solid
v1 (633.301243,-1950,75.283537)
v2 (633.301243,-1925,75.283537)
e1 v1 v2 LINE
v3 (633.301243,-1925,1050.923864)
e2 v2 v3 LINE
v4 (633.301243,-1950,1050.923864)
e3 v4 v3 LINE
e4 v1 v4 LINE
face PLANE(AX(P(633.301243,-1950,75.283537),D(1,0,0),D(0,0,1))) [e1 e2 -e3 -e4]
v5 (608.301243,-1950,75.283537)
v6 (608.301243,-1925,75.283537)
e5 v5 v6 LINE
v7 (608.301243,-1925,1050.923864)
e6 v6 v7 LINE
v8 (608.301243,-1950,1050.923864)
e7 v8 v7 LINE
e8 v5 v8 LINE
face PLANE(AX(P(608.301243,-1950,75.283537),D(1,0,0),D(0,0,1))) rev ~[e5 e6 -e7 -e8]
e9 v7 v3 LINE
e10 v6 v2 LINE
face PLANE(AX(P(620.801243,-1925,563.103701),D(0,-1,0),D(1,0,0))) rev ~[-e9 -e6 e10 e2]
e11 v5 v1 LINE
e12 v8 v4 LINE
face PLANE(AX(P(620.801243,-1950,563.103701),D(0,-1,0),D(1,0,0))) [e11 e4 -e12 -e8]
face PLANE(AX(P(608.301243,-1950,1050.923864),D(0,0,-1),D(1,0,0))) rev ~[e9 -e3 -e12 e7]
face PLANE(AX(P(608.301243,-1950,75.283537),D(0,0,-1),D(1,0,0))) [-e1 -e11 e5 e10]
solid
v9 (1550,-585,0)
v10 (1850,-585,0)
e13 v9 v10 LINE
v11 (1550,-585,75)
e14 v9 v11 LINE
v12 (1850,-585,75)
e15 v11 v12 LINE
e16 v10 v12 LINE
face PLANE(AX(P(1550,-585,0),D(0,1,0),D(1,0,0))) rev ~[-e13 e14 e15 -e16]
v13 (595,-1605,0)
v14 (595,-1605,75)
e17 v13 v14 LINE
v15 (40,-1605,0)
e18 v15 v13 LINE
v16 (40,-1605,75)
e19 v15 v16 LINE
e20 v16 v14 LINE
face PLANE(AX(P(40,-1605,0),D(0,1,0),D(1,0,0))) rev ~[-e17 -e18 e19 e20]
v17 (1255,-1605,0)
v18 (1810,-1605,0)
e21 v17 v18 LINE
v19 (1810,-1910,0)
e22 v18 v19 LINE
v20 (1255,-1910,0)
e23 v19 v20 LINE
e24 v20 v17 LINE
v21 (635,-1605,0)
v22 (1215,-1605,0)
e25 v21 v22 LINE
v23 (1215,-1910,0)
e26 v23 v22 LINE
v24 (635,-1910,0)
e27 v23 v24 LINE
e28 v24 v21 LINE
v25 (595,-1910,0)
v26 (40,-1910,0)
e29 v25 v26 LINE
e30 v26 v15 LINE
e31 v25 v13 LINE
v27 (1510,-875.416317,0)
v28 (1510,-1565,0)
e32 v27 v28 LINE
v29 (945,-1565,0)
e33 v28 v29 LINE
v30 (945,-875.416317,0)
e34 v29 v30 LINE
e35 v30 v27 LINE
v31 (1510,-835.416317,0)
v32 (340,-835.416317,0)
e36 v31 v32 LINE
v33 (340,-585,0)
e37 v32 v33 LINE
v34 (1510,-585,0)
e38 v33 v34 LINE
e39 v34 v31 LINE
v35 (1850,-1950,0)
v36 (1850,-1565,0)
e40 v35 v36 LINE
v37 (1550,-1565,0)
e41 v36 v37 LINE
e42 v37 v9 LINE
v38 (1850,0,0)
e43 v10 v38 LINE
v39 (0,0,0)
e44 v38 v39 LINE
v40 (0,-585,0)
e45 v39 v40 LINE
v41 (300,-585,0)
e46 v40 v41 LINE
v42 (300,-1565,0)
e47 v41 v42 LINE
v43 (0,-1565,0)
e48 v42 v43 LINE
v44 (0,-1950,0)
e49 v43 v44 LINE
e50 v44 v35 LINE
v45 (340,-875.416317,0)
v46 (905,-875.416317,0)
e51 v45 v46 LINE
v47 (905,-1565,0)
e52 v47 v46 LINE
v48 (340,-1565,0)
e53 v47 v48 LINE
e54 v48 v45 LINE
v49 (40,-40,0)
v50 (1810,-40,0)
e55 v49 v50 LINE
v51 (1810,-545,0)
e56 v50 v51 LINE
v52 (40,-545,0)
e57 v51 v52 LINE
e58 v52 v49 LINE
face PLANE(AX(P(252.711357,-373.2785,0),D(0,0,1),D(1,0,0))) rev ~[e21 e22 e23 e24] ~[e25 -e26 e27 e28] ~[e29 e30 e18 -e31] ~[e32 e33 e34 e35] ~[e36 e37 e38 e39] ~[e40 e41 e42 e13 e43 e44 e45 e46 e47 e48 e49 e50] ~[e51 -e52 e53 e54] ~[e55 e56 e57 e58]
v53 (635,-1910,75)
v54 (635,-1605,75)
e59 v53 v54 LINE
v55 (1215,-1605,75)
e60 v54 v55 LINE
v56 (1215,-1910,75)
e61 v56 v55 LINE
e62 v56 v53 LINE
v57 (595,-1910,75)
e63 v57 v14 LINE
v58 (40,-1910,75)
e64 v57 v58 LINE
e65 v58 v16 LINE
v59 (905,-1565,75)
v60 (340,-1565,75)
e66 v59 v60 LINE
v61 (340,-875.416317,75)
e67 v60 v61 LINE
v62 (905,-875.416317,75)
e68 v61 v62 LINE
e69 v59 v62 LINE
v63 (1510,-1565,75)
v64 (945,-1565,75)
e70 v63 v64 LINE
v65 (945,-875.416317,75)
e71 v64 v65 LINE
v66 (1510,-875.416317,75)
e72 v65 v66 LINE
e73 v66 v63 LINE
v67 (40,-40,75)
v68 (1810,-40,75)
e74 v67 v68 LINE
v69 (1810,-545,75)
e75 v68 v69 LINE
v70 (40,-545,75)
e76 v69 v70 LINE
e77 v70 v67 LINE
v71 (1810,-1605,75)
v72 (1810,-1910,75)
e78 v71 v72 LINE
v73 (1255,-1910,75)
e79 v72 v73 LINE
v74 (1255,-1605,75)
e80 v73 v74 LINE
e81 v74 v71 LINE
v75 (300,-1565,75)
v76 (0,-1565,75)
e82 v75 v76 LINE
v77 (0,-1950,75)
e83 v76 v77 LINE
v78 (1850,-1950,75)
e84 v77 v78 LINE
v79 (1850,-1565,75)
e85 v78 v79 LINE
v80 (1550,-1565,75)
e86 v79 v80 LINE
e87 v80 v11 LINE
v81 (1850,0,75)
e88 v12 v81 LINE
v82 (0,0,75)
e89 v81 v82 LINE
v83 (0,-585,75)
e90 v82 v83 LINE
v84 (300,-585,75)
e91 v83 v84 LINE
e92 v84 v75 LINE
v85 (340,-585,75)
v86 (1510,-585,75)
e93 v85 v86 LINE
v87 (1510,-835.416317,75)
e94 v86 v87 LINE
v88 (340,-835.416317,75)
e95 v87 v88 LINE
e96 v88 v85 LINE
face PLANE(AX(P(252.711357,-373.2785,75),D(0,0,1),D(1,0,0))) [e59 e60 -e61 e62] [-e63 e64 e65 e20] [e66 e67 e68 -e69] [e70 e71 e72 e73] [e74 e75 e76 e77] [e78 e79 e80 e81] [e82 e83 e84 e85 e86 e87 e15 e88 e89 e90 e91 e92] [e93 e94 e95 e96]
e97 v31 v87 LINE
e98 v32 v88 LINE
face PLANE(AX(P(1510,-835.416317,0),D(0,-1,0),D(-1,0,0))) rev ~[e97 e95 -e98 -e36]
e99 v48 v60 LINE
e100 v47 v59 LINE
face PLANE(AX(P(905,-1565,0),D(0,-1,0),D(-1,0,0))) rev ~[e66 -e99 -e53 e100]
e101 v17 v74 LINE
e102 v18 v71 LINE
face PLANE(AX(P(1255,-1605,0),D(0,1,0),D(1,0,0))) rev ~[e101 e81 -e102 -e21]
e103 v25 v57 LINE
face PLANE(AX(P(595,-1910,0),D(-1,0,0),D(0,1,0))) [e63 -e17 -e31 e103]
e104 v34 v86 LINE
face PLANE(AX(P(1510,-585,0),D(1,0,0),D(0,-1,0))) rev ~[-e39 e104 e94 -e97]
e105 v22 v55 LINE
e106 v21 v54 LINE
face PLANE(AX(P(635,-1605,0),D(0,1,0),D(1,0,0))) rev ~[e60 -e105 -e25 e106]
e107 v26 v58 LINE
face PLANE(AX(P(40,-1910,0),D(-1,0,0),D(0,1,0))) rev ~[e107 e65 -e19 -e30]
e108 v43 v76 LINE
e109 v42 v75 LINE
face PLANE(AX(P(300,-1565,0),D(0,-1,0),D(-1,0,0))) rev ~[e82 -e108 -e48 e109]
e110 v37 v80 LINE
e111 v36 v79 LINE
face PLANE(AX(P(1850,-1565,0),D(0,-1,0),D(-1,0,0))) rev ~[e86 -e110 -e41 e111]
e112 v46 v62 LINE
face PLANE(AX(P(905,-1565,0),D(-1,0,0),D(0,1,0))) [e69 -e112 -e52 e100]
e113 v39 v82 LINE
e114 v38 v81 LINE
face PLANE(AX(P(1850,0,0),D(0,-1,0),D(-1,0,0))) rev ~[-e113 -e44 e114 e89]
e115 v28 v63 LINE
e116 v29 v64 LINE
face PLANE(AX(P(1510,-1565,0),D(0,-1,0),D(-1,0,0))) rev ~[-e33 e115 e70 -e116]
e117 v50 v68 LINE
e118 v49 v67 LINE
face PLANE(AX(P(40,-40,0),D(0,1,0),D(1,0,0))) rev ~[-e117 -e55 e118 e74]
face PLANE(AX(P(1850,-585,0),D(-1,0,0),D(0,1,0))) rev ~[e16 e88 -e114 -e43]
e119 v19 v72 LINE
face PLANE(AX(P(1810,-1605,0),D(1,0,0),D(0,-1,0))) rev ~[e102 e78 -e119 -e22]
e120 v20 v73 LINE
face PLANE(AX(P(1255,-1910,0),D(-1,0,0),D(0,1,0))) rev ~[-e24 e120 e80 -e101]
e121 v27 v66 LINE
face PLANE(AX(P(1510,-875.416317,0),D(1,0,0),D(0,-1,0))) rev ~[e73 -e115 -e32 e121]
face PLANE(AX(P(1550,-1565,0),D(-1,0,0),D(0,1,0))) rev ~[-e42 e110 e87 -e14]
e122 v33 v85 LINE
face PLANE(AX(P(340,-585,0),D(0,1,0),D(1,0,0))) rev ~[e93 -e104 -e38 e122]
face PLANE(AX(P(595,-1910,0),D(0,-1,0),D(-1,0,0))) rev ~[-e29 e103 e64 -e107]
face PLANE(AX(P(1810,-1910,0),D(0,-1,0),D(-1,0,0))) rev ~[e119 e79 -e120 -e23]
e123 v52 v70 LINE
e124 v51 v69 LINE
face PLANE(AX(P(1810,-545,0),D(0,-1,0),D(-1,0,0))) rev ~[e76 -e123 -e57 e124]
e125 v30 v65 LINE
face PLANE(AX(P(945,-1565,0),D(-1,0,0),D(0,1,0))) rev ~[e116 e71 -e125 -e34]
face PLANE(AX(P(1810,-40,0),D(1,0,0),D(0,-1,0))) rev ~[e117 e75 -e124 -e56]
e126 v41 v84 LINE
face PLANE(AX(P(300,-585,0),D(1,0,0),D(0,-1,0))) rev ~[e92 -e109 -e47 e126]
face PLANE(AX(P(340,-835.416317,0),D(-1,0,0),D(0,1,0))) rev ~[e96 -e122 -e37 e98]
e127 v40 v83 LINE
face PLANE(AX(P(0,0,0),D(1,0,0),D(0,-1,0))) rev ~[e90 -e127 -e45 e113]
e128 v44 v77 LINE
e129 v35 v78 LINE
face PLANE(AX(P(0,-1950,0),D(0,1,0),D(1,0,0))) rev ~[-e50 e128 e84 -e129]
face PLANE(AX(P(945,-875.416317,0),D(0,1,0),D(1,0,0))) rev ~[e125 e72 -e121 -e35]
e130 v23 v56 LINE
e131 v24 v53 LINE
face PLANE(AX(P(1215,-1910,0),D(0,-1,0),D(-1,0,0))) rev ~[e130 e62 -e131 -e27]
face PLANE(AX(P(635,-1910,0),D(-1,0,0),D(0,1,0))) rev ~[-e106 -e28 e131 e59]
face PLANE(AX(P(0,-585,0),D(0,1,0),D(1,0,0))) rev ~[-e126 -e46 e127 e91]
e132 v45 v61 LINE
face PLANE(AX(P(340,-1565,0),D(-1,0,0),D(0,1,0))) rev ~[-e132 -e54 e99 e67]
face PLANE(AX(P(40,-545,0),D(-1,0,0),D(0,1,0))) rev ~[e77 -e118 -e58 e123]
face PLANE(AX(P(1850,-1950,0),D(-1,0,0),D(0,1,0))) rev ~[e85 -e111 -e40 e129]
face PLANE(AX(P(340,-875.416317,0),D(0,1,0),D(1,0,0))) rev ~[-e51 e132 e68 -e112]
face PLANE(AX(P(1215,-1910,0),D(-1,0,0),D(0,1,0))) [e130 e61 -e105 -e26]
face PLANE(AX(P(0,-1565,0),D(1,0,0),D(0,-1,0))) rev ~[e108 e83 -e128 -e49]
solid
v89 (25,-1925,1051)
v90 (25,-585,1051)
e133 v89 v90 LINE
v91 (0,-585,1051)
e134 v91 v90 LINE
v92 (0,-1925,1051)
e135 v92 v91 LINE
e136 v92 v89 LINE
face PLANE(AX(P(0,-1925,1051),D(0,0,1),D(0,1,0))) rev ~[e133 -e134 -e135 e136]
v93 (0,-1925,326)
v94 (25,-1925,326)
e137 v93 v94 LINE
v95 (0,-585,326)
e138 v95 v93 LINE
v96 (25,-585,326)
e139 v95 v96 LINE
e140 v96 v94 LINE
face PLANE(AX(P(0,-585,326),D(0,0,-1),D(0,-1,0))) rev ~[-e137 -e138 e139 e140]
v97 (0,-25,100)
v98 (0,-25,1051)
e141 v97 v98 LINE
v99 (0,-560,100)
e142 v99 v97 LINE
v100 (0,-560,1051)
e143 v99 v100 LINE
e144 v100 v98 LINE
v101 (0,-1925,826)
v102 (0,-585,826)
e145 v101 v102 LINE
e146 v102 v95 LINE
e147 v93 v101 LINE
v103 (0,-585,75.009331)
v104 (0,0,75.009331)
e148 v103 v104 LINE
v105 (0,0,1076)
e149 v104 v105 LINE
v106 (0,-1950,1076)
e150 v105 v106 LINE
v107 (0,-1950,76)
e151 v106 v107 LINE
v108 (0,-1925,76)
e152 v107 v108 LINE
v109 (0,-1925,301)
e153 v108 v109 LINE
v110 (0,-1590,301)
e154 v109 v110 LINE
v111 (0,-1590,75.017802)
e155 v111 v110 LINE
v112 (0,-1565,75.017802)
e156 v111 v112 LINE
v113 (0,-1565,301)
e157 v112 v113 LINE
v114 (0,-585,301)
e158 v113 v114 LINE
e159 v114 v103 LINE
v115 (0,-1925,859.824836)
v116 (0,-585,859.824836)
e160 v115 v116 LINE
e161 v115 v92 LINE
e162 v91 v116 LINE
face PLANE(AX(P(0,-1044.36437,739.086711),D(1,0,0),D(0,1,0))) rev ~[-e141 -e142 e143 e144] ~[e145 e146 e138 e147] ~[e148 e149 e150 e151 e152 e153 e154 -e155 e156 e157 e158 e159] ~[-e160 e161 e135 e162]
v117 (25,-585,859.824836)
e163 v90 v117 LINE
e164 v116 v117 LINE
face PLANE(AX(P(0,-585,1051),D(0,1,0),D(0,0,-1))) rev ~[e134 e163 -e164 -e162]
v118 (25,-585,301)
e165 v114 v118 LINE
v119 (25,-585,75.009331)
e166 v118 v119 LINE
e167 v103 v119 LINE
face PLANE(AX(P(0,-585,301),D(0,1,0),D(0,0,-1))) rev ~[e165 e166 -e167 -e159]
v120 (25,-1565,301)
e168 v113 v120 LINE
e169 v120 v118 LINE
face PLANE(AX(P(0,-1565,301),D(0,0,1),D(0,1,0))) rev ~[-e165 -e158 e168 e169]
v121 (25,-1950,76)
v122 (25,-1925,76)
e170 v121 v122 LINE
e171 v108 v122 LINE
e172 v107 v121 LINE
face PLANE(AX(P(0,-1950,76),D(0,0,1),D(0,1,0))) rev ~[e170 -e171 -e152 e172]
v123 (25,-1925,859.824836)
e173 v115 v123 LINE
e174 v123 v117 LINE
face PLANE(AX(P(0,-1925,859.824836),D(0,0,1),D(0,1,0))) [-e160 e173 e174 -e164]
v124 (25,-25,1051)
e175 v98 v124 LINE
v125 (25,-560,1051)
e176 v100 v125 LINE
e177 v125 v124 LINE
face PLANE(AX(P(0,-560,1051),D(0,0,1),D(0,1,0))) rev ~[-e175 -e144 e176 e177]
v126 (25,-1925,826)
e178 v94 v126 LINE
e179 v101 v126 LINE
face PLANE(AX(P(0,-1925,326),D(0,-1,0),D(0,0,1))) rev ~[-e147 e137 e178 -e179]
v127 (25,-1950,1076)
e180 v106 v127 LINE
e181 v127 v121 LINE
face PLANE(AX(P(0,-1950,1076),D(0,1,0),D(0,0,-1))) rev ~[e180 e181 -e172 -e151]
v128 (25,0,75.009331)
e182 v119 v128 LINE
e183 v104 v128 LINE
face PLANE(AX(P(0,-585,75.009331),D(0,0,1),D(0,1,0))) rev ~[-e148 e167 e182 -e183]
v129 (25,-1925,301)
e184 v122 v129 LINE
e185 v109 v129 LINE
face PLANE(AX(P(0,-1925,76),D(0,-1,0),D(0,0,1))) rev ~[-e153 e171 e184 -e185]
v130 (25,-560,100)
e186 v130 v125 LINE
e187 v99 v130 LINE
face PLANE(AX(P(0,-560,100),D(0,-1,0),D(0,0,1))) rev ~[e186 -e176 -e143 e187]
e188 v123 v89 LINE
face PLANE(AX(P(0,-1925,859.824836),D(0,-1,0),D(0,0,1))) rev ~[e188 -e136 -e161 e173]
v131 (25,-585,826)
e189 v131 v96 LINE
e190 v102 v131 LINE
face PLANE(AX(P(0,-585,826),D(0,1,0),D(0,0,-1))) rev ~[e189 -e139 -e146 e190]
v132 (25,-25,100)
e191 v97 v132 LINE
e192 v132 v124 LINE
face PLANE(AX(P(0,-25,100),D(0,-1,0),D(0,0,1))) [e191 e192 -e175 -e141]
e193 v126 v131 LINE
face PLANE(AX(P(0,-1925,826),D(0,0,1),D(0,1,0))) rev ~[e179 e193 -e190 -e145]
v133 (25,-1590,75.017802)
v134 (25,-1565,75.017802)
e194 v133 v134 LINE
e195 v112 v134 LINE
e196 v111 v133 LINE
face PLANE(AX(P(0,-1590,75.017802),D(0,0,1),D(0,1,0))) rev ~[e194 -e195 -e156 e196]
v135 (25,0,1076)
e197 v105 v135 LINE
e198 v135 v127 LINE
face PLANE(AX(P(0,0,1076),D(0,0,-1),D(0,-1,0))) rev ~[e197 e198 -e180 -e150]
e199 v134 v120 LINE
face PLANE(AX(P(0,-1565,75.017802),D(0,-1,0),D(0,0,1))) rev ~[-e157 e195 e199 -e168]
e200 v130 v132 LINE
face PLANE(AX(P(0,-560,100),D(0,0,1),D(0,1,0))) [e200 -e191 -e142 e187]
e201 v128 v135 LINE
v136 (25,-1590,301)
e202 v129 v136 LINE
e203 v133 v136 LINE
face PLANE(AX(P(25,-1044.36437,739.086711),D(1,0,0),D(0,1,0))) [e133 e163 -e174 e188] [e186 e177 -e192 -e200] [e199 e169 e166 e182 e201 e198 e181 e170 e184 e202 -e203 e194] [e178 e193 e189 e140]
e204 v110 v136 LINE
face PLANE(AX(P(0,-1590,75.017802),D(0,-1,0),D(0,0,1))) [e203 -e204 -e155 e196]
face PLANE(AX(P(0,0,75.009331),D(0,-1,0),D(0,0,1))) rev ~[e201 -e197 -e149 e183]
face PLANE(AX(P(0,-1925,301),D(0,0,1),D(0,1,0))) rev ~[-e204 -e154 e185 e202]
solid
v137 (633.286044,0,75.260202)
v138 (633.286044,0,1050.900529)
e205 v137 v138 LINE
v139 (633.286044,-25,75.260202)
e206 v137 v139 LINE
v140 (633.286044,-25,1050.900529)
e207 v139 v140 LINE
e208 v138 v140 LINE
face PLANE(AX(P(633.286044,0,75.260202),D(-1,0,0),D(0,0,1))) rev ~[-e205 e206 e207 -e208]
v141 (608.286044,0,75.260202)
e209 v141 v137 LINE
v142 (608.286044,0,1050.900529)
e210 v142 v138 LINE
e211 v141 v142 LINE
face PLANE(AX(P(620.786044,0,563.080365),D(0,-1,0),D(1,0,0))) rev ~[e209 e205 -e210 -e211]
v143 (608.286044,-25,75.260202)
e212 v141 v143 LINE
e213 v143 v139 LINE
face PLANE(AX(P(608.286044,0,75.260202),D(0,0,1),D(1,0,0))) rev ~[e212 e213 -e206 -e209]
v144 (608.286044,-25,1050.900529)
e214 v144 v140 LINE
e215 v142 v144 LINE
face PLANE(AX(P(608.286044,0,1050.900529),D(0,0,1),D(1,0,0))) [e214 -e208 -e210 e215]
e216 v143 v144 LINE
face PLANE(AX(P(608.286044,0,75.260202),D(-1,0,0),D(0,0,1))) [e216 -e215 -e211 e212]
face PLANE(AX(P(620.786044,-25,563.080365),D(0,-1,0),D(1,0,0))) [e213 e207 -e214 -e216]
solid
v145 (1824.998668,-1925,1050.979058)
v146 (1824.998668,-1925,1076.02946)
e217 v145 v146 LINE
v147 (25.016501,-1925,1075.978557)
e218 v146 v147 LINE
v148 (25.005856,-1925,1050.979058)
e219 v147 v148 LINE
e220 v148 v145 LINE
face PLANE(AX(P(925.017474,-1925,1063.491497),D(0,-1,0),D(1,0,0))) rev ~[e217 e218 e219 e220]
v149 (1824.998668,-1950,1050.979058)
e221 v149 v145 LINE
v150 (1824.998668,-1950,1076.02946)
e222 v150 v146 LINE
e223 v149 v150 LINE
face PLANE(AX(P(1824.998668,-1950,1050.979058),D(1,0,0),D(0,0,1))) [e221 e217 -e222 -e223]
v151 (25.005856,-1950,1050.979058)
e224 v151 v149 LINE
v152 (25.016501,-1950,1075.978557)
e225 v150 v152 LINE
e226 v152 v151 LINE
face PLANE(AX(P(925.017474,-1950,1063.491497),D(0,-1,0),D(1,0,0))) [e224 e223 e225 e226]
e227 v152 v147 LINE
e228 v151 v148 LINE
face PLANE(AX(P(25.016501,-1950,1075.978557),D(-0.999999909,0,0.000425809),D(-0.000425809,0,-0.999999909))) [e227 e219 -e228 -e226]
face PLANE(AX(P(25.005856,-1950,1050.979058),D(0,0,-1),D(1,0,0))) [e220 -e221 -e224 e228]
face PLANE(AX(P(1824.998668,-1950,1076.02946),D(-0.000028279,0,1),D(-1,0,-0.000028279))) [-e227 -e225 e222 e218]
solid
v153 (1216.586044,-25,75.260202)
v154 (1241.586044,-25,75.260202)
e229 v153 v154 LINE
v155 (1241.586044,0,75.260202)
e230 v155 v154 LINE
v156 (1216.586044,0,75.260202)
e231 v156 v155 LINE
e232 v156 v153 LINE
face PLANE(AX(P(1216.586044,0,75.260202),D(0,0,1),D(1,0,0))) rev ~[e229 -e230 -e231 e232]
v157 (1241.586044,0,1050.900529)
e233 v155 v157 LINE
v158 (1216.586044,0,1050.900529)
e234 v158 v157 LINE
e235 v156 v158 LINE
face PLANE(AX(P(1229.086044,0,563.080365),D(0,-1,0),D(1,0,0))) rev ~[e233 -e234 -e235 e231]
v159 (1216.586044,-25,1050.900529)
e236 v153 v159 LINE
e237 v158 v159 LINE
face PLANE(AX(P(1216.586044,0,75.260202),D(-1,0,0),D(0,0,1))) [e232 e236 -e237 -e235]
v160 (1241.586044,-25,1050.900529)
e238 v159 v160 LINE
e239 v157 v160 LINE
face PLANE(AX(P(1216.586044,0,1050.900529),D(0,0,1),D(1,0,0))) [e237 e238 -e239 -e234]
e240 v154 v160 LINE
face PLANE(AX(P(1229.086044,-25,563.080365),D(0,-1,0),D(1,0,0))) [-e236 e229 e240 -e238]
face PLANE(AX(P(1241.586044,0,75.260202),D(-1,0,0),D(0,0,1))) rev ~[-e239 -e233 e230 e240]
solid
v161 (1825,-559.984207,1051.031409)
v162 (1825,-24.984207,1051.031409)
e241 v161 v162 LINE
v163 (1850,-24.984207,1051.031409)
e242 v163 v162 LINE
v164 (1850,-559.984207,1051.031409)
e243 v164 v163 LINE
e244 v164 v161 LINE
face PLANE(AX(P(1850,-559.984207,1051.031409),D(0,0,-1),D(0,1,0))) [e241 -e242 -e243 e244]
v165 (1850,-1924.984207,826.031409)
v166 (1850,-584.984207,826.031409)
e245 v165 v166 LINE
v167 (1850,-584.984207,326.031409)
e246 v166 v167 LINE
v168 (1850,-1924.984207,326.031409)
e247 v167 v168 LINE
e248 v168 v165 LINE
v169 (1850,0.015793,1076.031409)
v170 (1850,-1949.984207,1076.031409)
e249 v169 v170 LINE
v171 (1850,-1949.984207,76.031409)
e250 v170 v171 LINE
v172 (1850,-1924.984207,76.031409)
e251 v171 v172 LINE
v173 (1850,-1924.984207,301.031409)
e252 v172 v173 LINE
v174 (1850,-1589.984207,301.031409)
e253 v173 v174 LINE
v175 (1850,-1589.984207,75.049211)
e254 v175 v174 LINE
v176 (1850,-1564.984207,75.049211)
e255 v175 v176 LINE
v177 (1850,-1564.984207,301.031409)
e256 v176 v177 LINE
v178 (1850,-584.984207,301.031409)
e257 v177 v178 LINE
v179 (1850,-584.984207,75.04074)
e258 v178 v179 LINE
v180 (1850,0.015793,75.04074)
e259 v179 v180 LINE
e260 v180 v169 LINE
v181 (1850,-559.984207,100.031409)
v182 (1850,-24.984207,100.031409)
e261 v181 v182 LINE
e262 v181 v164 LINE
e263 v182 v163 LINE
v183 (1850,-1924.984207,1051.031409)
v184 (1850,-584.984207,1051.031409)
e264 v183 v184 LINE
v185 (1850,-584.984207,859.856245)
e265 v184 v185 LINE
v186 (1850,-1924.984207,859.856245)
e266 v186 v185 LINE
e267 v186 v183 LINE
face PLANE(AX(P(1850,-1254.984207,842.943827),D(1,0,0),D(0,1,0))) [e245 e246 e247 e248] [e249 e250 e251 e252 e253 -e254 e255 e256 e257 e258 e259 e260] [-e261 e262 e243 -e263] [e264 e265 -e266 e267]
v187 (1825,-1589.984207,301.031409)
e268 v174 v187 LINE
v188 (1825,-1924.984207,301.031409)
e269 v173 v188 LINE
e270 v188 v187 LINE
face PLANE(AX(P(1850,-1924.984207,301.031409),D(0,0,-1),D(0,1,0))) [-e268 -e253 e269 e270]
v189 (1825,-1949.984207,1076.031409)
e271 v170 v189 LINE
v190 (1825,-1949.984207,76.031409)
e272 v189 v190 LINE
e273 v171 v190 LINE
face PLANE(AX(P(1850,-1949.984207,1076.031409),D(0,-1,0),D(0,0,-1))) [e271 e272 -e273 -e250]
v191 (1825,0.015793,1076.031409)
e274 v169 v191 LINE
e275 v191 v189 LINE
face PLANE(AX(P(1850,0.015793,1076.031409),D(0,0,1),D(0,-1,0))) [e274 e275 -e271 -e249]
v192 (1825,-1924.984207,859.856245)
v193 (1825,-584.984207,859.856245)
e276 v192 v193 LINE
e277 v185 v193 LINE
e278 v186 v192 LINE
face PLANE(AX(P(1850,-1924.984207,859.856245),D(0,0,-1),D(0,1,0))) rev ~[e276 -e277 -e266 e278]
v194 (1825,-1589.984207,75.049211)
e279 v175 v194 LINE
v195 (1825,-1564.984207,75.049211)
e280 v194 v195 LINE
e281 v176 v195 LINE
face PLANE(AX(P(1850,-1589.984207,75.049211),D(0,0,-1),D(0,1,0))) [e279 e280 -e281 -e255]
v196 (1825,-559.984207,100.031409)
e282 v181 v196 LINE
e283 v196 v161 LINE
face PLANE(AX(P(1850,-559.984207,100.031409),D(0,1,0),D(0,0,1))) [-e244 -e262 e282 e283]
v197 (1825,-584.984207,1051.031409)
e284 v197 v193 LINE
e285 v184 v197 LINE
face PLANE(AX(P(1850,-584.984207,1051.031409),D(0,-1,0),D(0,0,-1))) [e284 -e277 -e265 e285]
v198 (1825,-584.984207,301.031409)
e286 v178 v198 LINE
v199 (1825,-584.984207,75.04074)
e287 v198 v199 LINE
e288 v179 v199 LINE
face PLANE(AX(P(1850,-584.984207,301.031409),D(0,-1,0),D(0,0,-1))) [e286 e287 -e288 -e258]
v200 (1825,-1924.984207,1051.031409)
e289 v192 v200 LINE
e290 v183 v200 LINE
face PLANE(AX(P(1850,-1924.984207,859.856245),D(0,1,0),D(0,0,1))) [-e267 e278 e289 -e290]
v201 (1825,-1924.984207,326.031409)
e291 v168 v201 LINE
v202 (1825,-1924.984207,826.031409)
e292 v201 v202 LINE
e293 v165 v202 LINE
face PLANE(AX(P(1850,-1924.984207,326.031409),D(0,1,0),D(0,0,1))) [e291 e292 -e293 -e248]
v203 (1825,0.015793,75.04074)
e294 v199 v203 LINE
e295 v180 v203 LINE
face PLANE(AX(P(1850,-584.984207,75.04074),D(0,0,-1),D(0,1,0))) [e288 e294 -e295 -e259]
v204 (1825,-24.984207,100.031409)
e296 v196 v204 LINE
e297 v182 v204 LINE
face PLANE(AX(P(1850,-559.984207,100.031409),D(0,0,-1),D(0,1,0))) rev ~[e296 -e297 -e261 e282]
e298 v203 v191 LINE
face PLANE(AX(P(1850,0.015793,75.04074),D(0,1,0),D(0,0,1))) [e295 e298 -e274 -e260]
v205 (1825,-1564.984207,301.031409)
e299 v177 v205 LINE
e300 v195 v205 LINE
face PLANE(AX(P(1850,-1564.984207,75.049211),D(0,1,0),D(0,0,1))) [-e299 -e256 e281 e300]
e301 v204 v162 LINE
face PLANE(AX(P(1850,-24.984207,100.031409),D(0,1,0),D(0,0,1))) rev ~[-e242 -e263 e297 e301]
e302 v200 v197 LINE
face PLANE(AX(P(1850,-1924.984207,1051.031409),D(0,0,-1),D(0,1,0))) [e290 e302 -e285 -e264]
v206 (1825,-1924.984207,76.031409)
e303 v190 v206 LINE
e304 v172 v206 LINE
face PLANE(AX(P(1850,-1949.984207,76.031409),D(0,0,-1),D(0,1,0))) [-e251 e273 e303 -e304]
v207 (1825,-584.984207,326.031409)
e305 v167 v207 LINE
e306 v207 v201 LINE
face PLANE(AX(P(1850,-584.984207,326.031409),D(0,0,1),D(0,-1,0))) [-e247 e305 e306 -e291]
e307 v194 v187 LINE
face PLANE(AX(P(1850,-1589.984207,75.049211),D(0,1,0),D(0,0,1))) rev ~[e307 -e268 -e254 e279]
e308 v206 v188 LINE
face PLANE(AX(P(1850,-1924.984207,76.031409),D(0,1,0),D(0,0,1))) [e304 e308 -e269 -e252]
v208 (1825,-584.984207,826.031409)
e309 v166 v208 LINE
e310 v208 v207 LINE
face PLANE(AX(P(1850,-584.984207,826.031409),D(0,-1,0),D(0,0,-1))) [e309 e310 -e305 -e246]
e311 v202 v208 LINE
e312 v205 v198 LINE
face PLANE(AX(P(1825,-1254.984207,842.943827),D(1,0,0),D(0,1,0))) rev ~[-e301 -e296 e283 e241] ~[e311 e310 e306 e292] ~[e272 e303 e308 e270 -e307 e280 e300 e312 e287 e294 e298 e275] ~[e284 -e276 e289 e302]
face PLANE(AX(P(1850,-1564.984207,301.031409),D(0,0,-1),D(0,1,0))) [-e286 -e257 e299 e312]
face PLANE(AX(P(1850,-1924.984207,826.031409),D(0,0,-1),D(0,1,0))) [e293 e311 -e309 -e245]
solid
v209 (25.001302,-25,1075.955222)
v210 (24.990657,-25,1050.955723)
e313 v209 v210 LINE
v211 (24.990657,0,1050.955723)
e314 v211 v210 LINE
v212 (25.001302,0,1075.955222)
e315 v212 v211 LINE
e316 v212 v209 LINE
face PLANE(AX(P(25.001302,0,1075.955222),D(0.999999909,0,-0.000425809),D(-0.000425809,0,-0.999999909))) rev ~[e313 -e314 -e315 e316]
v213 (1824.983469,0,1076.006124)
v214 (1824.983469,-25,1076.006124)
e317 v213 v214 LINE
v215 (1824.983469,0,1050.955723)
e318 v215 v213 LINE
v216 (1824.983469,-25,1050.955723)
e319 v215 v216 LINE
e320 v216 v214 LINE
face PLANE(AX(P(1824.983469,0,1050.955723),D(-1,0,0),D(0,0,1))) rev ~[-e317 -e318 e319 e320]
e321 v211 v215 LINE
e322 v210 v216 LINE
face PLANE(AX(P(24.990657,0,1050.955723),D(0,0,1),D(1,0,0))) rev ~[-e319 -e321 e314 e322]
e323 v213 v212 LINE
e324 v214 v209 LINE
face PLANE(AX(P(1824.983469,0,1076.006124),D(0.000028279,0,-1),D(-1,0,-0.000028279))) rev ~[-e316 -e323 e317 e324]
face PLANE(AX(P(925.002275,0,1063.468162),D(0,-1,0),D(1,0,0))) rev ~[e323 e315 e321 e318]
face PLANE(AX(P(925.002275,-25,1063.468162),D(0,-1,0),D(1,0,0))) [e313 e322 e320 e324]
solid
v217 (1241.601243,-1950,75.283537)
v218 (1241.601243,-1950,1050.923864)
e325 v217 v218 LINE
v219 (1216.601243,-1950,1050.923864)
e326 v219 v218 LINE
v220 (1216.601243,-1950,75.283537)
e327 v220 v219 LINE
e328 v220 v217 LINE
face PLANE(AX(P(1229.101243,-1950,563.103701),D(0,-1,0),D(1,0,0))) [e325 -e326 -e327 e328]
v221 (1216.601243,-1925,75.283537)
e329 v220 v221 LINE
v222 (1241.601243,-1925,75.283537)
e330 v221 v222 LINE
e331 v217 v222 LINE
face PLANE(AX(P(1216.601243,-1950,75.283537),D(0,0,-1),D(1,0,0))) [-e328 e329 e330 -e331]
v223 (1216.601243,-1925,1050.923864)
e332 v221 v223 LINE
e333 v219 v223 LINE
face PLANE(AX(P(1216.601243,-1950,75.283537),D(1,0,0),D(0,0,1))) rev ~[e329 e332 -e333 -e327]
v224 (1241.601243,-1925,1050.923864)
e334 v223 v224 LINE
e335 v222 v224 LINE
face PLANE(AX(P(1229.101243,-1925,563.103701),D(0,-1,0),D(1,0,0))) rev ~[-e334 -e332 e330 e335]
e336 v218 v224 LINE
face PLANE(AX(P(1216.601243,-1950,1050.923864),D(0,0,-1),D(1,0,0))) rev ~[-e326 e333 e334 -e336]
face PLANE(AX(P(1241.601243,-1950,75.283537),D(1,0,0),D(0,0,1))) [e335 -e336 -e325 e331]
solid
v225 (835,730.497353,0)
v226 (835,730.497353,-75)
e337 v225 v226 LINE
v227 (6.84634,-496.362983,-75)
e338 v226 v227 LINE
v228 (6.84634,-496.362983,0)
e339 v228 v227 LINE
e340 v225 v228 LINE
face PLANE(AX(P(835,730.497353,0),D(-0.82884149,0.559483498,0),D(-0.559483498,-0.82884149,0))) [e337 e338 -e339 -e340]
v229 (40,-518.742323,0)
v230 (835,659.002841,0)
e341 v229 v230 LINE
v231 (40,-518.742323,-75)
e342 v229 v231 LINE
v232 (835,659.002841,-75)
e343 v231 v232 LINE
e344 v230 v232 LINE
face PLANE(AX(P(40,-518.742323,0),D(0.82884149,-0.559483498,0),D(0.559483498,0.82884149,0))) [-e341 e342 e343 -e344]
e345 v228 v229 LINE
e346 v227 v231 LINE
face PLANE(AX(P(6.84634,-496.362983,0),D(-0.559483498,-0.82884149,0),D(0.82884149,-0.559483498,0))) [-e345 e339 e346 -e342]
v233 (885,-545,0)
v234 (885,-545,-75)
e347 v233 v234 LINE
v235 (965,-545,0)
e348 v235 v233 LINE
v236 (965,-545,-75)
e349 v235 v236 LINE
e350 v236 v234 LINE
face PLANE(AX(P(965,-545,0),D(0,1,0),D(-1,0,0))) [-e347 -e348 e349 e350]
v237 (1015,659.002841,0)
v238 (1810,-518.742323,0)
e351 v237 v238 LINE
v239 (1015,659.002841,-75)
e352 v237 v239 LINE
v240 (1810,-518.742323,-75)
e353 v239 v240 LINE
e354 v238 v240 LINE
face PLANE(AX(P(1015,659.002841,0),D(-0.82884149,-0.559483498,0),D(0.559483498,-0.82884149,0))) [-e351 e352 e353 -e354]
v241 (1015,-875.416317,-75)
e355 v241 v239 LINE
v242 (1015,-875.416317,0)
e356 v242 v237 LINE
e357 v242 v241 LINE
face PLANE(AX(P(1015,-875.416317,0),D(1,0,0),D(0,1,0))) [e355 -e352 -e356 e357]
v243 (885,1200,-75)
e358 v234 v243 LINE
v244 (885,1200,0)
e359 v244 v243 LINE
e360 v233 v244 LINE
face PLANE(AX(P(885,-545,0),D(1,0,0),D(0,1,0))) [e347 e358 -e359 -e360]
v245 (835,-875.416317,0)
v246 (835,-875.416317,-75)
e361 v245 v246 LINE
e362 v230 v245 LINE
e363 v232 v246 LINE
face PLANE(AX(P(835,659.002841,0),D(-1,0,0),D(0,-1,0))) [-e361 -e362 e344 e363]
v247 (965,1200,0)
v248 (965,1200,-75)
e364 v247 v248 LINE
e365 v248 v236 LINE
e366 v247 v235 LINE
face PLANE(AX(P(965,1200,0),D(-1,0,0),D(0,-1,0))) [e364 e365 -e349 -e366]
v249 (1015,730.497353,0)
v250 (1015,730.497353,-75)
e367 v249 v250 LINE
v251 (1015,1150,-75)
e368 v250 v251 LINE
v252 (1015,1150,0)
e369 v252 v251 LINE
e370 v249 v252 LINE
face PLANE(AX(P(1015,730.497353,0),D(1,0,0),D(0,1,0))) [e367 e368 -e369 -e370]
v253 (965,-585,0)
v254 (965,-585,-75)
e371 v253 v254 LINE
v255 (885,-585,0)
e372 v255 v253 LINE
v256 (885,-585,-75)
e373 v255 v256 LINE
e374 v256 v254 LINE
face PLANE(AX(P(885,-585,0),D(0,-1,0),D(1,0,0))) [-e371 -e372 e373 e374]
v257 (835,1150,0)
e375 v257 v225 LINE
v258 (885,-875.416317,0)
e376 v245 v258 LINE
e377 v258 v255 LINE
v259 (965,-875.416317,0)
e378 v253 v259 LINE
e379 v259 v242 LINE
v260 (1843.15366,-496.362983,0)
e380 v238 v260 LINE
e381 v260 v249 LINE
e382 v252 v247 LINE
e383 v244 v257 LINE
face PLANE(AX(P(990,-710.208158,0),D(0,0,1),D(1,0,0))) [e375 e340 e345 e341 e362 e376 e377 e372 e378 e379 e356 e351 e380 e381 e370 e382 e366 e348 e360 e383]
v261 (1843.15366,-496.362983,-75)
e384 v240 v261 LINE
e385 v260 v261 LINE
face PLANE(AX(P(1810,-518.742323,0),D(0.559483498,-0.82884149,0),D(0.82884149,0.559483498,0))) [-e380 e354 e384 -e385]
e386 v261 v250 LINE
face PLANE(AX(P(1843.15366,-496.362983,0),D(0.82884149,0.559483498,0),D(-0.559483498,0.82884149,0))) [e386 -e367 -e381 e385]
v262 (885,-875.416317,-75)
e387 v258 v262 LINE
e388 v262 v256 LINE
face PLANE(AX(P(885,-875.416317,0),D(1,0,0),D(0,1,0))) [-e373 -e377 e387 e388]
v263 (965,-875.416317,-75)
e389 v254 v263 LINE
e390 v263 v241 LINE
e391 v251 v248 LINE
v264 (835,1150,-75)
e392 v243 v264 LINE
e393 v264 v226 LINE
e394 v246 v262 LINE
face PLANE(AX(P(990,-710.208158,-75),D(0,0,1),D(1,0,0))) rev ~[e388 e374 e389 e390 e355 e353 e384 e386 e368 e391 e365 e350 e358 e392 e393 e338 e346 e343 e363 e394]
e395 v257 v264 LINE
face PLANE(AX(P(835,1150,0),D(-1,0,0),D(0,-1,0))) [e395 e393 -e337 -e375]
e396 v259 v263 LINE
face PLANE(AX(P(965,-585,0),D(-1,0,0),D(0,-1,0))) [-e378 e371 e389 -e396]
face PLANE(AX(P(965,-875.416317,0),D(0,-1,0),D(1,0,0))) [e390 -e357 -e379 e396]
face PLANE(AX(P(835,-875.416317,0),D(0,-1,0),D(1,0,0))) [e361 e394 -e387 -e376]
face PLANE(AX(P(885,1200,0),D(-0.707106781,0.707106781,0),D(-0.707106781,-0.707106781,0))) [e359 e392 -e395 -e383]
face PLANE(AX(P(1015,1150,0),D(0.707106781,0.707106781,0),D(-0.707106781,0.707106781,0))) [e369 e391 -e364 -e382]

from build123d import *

# Parameters (mm, degrees)
F0_W      = 50
F0_H      = 40
F0_W_2    = 80
F0_W_3    = 495
F0_W_4    = 40
F0_H_2    = 689.5836830139
F0_H_3    = 305
F1_DEPTH  = 75
F0_H_4    = 250.4163169861
F0_H_5    = 505
F2_DEPTH  = 75
F3_W      = 535
F3_H      = 951
F3_W_2    = 25
F3_H_2    = 225.9821975827
F3_W_3    = 1340
F3_H_3    = 33.8248362541
F4_DEPTH  = 25
F7_W      = 1340
F7_H      = 33.8248362541
F7_W_2    = 535
F7_H_2    = 951
F7_W_3    = 25
F7_H_3    = 225.9821975827
F8_DEPTH  = 25
F9_W      = 25
F9_H      = 975.6403267384
F10_DEPTH = 25
F12_DEPTH = 25
F11_W     = 25
F11_H     = 975.6403267384


# Not quite as in the source:
# - a feature names something its author has since deleted; it is built from what else it names


with BuildPart() as f1:
    # F0 (on Top) → F1 (new body)
    with BuildSketch(Plane.XY):
        Polygon((341.9006320566, 0), (0, 0), (0, -585), (300, -585), (340, -585), (835, -585), (835, -545), (40, -545), (40, -518.7423229218), (6.8463404132, -496.362982985), (40, -447.2478103703), (40, -40), (314.8998843676, -40), align=None)
        Polygon((390.1607644204, 0), (341.9006320566, 0), (314.8998843676, -40), (363.1600167314, -40), align=None)
        Polygon((835, 0), (390.1607644204, 0), (363.1600167314, -40), (835, -40), align=None)
        Polygon((340, -585), (300, -585), (300, -1565), (340, -1565), (340, -875.4163169861), (340, -835.4163169861), align=None)
        with Locations((860, -20)):
            Rectangle(F0_W, F0_H)
        Polygon((40, -518.7423229218), (40, -447.2478103703), (6.8463404132, -496.362982985), align=None)
        Polygon((340, -1565), (300, -1565), (0, -1565), (0, -1950), (1850, -1950), (1850, -1565), (1550, -1565), (1510, -1565), (945, -1565), (905, -1565), align=None)
        Polygon((1255, -1605), (1810, -1605), (1810, -1910), (1255, -1910), (1215, -1910), (635, -1910), (595, -1910), (40, -1910), (40, -1605), (595, -1605), (635, -1605), (1215, -1605), align=None, mode=Mode.SUBTRACT)
        with Locations((925, -20)):
            Rectangle(F0_W_2, F0_H)
        with Locations((860, -565)):
            Rectangle(F0_W, F0_H)
        with Locations((587.5, -855.4163169861)):
            Rectangle(F0_W_3, F0_H)
        with Locations((990, -20)):
            Rectangle(F0_W, F0_H)
        with Locations((925, -565)):
            Rectangle(F0_W_2, F0_H)
        with Locations((860, -855.4163169861)):
            Rectangle(F0_W, F0_H)
        with Locations((925, -1220.208158493)):
            Rectangle(F0_W_4, F0_H_2)
        Polygon((1459.8392355796, 0), (1015, 0), (1015, -40), (1486.8399832686, -40), align=None)
        with Locations((990, -565)):
            Rectangle(F0_W, F0_H)
        Polygon((965, -835.4163169861), (885, -835.4163169861), (885, -875.4163169861), (905, -875.4163169861), (945, -875.4163169861), (965, -875.4163169861), align=None)
        Polygon((1508.0993679434, 0), (1459.8392355796, 0), (1486.8399832686, -40), (1535.1001156324, -40), align=None)
        Polygon((1015, -545), (1015, -585), (1510, -585), (1550, -585), (1850, -585), (1850, 0), (1508.0993679434, 0), (1535.1001156324, -40), (1810, -40), (1810, -447.2478103703), (1843.1536595868, -496.362982985), (1810, -518.7423229218), (1810, -545), align=None)
        with Locations((990, -855.4163169861)):
            Rectangle(F0_W, F0_H)
        Polygon((1510, -875.4163169861), (1510, -1565), (1550, -1565), (1550, -585), (1510, -585), (1510, -835.4163169861), align=None)
        with Locations((1262.5, -855.4163169861)):
            Rectangle(F0_W_3, F0_H)
        Polygon((1810, -447.2478103703), (1810, -518.7423229218), (1843.1536595868, -496.362982985), align=None)
        with Locations((1235, -1757.5)):
            Rectangle(F0_W_4, F0_H_3)
        with Locations((615, -1757.5)):
            Rectangle(F0_W_4, F0_H_3)
    extrude(amount=F1_DEPTH)


with BuildPart() as f2:
    # F0 (on Top) → F2 (new body)
    with BuildSketch(Plane.XY):
        with Locations((990, -710.208158493)):
            Rectangle(F0_W, F0_H_4)
        Polygon((835, 730.4973530704), (341.9006320566, 0), (390.1607644204, 0), (835, 659.0028405189), align=None)
        Polygon((363.1600167314, -40), (314.8998843676, -40), (40, -447.2478103703), (40, -518.7423229218), align=None)
        Polygon((390.1607644204, 0), (341.9006320566, 0), (314.8998843676, -40), (363.1600167314, -40), align=None)
        with Locations((990, -292.5)):
            Rectangle(F0_W, F0_H_5)
        Polygon((1535.1001156324, -40), (1486.8399832686, -40), (1810, -518.7423229218), (1810, -447.2478103703), align=None)
        Polygon((1015, 659.0028405189), (1459.8392355796, 0), (1508.0993679434, 0), (1015, 730.4973530704), align=None)
        Polygon((1508.0993679434, 0), (1459.8392355796, 0), (1486.8399832686, -40), (1535.1001156324, -40), align=None)
        with Locations((990, -20)):
            Rectangle(F0_W, F0_H)
        with Locations((860, -20)):
            Rectangle(F0_W, F0_H)
        with Locations((860, -565)):
            Rectangle(F0_W, F0_H)
        with Locations((925, -565)):
            Rectangle(F0_W_2, F0_H)
        with Locations((990, -565)):
            Rectangle(F0_W, F0_H)
        with Locations((860, -855.4163169861)):
            Rectangle(F0_W, F0_H)
        with Locations((990, -855.4163169861)):
            Rectangle(F0_W, F0_H)
        Polygon((40, -518.7423229218), (40, -447.2478103703), (6.8463404132, -496.362982985), align=None)
        Polygon((1810, -447.2478103703), (1810, -518.7423229218), (1843.1536595868, -496.362982985), align=None)
        with Locations((860, -292.5)):
            Rectangle(F0_W, F0_H_5)
        with Locations((860, -710.208158493)):
            Rectangle(F0_W, F0_H_4)
        Polygon((835, 1150), (835, 730.4973530704), (835, 659.0028405189), (835, 0), (885, 0), (885, 1200), align=None)
        Polygon((965, 1200), (965, 0), (1015, 0), (1015, 659.0028405189), (1015, 730.4973530704), (1015, 1150), align=None)
    extrude(amount=-F2_DEPTH)


with BuildPart() as f4:
    # F3 (on Right) → F4 (new body)
    with BuildSketch(Plane.YZ):
        Polygon((0, 75.0093311071), (0, 1076), (-1950, 1076), (-1950, 76), (-1925, 76), (-1925, 301), (-1925, 326), (-1925, 826), (-1925, 859.8248362541), (-1925, 1051), (-585, 1051), (-585, 859.8248362541), (-585, 826), (-585, 326), (-585, 301), (-585, 75.0093311071), align=None)
        with Locations((-292.5, 575.5)):
            Rectangle(F3_W, F3_H, mode=Mode.SUBTRACT)
        Polygon((-1565, 301), (-585, 301), (-585, 326), (-1925, 326), (-1925, 301), (-1590, 301), align=None)
        with Locations((-1577.5, 188.0089012086)):
            Rectangle(F3_W_2, F3_H_2)
        with Locations((-1255, 842.9124181271)):
            Rectangle(F3_W_3, F3_H_3)
    extrude(amount=F4_DEPTH)


with BuildPart() as f8:
    # F7 (on offset) → F8 (new body)
    with BuildSketch(Plane.YZ.offset(1850)):
        with Locations((-1254.9842073394, 842.9438270557)):
            Rectangle(F7_W, F7_H)
        Polygon((0.0157926606, 75.0407400358), (0.0157926606, 1076.0314089287), (-1949.9842073394, 1076.0314089287), (-1949.9842073394, 76.0314089287), (-1924.9842073394, 76.0314089287), (-1924.9842073394, 301.0314089287), (-1924.9842073394, 326.0314089287), (-1924.9842073394, 826.0314089287), (-1924.9842073394, 859.8562451828), (-1924.9842073394, 1051.0314089287), (-584.9842073394, 1051.0314089287), (-584.9842073394, 859.8562451828), (-584.9842073394, 826.0314089287), (-584.9842073394, 326.0314089287), (-584.9842073394, 301.0314089287), (-584.9842073394, 75.0407400358), align=None)
        with Locations((-292.4842073394, 575.5314089287)):
            Rectangle(F7_W_2, F7_H_2, mode=Mode.SUBTRACT)
        Polygon((-1564.9842073394, 301.0314089287), (-584.9842073394, 301.0314089287), (-584.9842073394, 326.0314089287), (-1924.9842073394, 326.0314089287), (-1924.9842073394, 301.0314089287), (-1589.9842073394, 301.0314089287), align=None)
        with Locations((-1577.4842073394, 188.0403101373)):
            Rectangle(F7_W_3, F7_H_3)
    extrude(amount=-F8_DEPTH)


with BuildPart() as f10:
    # F9 (on Front) → F10 (new body)
    with BuildSketch(Plane.XZ):
        with Locations((1229.0860442189, 563.0803654591)):
            Rectangle(F9_W, F9_H)
    extrude(amount=F10_DEPTH)


with BuildPart() as f10b:
    # F9 (on Front) → F10, piece 2 (new body)
    with BuildSketch(Plane.XZ):
        with Locations((620.7860442189, 563.0803654591)):
            Rectangle(F9_W, F9_H)
    extrude(amount=F10_DEPTH)


with BuildPart() as f10c:
    # F9 (on Front) → F10, piece 3 (new body)
    with BuildSketch(Plane.XZ):
        Polygon((25.0013015178, 1075.9552220504), (24.9906565008, 1050.9557227294), (1824.9834692982, 1050.9557227294), (1824.9834692982, 1076.006124417), align=None)
    extrude(amount=F10_DEPTH)


with BuildPart() as f12:
    # F11 (on offset) → F12 (new body)
    with BuildSketch(Plane.XZ.offset(1950)):
        Polygon((25.0165007023, 1075.9785572688), (25.0058556852, 1050.9790579478), (1824.9986684827, 1050.9790579478), (1824.9986684827, 1076.0294596354), align=None)
    extrude(amount=-F12_DEPTH)


with BuildPart() as f12b:
    # F11 (on offset) → F12, piece 2 (new body)
    with BuildSketch(Plane.XZ.offset(1950)):
        with Locations((620.8012434033, 563.1037006776)):
            Rectangle(F11_W, F11_H)
    extrude(amount=-F12_DEPTH)


with BuildPart() as f12c:
    # F11 (on offset) → F12, piece 3 (new body)
    with BuildSketch(Plane.XZ.offset(1950)):
        with Locations((1229.1012434033, 563.1037006776)):
            Rectangle(F11_W, F11_H)
    extrude(amount=-F12_DEPTH)


solid = Compound([f1.part, f2.part, f4.part, f8.part, f10.part, f10b.part, f10c.part, f12.part, f12b.part, f12c.part])
